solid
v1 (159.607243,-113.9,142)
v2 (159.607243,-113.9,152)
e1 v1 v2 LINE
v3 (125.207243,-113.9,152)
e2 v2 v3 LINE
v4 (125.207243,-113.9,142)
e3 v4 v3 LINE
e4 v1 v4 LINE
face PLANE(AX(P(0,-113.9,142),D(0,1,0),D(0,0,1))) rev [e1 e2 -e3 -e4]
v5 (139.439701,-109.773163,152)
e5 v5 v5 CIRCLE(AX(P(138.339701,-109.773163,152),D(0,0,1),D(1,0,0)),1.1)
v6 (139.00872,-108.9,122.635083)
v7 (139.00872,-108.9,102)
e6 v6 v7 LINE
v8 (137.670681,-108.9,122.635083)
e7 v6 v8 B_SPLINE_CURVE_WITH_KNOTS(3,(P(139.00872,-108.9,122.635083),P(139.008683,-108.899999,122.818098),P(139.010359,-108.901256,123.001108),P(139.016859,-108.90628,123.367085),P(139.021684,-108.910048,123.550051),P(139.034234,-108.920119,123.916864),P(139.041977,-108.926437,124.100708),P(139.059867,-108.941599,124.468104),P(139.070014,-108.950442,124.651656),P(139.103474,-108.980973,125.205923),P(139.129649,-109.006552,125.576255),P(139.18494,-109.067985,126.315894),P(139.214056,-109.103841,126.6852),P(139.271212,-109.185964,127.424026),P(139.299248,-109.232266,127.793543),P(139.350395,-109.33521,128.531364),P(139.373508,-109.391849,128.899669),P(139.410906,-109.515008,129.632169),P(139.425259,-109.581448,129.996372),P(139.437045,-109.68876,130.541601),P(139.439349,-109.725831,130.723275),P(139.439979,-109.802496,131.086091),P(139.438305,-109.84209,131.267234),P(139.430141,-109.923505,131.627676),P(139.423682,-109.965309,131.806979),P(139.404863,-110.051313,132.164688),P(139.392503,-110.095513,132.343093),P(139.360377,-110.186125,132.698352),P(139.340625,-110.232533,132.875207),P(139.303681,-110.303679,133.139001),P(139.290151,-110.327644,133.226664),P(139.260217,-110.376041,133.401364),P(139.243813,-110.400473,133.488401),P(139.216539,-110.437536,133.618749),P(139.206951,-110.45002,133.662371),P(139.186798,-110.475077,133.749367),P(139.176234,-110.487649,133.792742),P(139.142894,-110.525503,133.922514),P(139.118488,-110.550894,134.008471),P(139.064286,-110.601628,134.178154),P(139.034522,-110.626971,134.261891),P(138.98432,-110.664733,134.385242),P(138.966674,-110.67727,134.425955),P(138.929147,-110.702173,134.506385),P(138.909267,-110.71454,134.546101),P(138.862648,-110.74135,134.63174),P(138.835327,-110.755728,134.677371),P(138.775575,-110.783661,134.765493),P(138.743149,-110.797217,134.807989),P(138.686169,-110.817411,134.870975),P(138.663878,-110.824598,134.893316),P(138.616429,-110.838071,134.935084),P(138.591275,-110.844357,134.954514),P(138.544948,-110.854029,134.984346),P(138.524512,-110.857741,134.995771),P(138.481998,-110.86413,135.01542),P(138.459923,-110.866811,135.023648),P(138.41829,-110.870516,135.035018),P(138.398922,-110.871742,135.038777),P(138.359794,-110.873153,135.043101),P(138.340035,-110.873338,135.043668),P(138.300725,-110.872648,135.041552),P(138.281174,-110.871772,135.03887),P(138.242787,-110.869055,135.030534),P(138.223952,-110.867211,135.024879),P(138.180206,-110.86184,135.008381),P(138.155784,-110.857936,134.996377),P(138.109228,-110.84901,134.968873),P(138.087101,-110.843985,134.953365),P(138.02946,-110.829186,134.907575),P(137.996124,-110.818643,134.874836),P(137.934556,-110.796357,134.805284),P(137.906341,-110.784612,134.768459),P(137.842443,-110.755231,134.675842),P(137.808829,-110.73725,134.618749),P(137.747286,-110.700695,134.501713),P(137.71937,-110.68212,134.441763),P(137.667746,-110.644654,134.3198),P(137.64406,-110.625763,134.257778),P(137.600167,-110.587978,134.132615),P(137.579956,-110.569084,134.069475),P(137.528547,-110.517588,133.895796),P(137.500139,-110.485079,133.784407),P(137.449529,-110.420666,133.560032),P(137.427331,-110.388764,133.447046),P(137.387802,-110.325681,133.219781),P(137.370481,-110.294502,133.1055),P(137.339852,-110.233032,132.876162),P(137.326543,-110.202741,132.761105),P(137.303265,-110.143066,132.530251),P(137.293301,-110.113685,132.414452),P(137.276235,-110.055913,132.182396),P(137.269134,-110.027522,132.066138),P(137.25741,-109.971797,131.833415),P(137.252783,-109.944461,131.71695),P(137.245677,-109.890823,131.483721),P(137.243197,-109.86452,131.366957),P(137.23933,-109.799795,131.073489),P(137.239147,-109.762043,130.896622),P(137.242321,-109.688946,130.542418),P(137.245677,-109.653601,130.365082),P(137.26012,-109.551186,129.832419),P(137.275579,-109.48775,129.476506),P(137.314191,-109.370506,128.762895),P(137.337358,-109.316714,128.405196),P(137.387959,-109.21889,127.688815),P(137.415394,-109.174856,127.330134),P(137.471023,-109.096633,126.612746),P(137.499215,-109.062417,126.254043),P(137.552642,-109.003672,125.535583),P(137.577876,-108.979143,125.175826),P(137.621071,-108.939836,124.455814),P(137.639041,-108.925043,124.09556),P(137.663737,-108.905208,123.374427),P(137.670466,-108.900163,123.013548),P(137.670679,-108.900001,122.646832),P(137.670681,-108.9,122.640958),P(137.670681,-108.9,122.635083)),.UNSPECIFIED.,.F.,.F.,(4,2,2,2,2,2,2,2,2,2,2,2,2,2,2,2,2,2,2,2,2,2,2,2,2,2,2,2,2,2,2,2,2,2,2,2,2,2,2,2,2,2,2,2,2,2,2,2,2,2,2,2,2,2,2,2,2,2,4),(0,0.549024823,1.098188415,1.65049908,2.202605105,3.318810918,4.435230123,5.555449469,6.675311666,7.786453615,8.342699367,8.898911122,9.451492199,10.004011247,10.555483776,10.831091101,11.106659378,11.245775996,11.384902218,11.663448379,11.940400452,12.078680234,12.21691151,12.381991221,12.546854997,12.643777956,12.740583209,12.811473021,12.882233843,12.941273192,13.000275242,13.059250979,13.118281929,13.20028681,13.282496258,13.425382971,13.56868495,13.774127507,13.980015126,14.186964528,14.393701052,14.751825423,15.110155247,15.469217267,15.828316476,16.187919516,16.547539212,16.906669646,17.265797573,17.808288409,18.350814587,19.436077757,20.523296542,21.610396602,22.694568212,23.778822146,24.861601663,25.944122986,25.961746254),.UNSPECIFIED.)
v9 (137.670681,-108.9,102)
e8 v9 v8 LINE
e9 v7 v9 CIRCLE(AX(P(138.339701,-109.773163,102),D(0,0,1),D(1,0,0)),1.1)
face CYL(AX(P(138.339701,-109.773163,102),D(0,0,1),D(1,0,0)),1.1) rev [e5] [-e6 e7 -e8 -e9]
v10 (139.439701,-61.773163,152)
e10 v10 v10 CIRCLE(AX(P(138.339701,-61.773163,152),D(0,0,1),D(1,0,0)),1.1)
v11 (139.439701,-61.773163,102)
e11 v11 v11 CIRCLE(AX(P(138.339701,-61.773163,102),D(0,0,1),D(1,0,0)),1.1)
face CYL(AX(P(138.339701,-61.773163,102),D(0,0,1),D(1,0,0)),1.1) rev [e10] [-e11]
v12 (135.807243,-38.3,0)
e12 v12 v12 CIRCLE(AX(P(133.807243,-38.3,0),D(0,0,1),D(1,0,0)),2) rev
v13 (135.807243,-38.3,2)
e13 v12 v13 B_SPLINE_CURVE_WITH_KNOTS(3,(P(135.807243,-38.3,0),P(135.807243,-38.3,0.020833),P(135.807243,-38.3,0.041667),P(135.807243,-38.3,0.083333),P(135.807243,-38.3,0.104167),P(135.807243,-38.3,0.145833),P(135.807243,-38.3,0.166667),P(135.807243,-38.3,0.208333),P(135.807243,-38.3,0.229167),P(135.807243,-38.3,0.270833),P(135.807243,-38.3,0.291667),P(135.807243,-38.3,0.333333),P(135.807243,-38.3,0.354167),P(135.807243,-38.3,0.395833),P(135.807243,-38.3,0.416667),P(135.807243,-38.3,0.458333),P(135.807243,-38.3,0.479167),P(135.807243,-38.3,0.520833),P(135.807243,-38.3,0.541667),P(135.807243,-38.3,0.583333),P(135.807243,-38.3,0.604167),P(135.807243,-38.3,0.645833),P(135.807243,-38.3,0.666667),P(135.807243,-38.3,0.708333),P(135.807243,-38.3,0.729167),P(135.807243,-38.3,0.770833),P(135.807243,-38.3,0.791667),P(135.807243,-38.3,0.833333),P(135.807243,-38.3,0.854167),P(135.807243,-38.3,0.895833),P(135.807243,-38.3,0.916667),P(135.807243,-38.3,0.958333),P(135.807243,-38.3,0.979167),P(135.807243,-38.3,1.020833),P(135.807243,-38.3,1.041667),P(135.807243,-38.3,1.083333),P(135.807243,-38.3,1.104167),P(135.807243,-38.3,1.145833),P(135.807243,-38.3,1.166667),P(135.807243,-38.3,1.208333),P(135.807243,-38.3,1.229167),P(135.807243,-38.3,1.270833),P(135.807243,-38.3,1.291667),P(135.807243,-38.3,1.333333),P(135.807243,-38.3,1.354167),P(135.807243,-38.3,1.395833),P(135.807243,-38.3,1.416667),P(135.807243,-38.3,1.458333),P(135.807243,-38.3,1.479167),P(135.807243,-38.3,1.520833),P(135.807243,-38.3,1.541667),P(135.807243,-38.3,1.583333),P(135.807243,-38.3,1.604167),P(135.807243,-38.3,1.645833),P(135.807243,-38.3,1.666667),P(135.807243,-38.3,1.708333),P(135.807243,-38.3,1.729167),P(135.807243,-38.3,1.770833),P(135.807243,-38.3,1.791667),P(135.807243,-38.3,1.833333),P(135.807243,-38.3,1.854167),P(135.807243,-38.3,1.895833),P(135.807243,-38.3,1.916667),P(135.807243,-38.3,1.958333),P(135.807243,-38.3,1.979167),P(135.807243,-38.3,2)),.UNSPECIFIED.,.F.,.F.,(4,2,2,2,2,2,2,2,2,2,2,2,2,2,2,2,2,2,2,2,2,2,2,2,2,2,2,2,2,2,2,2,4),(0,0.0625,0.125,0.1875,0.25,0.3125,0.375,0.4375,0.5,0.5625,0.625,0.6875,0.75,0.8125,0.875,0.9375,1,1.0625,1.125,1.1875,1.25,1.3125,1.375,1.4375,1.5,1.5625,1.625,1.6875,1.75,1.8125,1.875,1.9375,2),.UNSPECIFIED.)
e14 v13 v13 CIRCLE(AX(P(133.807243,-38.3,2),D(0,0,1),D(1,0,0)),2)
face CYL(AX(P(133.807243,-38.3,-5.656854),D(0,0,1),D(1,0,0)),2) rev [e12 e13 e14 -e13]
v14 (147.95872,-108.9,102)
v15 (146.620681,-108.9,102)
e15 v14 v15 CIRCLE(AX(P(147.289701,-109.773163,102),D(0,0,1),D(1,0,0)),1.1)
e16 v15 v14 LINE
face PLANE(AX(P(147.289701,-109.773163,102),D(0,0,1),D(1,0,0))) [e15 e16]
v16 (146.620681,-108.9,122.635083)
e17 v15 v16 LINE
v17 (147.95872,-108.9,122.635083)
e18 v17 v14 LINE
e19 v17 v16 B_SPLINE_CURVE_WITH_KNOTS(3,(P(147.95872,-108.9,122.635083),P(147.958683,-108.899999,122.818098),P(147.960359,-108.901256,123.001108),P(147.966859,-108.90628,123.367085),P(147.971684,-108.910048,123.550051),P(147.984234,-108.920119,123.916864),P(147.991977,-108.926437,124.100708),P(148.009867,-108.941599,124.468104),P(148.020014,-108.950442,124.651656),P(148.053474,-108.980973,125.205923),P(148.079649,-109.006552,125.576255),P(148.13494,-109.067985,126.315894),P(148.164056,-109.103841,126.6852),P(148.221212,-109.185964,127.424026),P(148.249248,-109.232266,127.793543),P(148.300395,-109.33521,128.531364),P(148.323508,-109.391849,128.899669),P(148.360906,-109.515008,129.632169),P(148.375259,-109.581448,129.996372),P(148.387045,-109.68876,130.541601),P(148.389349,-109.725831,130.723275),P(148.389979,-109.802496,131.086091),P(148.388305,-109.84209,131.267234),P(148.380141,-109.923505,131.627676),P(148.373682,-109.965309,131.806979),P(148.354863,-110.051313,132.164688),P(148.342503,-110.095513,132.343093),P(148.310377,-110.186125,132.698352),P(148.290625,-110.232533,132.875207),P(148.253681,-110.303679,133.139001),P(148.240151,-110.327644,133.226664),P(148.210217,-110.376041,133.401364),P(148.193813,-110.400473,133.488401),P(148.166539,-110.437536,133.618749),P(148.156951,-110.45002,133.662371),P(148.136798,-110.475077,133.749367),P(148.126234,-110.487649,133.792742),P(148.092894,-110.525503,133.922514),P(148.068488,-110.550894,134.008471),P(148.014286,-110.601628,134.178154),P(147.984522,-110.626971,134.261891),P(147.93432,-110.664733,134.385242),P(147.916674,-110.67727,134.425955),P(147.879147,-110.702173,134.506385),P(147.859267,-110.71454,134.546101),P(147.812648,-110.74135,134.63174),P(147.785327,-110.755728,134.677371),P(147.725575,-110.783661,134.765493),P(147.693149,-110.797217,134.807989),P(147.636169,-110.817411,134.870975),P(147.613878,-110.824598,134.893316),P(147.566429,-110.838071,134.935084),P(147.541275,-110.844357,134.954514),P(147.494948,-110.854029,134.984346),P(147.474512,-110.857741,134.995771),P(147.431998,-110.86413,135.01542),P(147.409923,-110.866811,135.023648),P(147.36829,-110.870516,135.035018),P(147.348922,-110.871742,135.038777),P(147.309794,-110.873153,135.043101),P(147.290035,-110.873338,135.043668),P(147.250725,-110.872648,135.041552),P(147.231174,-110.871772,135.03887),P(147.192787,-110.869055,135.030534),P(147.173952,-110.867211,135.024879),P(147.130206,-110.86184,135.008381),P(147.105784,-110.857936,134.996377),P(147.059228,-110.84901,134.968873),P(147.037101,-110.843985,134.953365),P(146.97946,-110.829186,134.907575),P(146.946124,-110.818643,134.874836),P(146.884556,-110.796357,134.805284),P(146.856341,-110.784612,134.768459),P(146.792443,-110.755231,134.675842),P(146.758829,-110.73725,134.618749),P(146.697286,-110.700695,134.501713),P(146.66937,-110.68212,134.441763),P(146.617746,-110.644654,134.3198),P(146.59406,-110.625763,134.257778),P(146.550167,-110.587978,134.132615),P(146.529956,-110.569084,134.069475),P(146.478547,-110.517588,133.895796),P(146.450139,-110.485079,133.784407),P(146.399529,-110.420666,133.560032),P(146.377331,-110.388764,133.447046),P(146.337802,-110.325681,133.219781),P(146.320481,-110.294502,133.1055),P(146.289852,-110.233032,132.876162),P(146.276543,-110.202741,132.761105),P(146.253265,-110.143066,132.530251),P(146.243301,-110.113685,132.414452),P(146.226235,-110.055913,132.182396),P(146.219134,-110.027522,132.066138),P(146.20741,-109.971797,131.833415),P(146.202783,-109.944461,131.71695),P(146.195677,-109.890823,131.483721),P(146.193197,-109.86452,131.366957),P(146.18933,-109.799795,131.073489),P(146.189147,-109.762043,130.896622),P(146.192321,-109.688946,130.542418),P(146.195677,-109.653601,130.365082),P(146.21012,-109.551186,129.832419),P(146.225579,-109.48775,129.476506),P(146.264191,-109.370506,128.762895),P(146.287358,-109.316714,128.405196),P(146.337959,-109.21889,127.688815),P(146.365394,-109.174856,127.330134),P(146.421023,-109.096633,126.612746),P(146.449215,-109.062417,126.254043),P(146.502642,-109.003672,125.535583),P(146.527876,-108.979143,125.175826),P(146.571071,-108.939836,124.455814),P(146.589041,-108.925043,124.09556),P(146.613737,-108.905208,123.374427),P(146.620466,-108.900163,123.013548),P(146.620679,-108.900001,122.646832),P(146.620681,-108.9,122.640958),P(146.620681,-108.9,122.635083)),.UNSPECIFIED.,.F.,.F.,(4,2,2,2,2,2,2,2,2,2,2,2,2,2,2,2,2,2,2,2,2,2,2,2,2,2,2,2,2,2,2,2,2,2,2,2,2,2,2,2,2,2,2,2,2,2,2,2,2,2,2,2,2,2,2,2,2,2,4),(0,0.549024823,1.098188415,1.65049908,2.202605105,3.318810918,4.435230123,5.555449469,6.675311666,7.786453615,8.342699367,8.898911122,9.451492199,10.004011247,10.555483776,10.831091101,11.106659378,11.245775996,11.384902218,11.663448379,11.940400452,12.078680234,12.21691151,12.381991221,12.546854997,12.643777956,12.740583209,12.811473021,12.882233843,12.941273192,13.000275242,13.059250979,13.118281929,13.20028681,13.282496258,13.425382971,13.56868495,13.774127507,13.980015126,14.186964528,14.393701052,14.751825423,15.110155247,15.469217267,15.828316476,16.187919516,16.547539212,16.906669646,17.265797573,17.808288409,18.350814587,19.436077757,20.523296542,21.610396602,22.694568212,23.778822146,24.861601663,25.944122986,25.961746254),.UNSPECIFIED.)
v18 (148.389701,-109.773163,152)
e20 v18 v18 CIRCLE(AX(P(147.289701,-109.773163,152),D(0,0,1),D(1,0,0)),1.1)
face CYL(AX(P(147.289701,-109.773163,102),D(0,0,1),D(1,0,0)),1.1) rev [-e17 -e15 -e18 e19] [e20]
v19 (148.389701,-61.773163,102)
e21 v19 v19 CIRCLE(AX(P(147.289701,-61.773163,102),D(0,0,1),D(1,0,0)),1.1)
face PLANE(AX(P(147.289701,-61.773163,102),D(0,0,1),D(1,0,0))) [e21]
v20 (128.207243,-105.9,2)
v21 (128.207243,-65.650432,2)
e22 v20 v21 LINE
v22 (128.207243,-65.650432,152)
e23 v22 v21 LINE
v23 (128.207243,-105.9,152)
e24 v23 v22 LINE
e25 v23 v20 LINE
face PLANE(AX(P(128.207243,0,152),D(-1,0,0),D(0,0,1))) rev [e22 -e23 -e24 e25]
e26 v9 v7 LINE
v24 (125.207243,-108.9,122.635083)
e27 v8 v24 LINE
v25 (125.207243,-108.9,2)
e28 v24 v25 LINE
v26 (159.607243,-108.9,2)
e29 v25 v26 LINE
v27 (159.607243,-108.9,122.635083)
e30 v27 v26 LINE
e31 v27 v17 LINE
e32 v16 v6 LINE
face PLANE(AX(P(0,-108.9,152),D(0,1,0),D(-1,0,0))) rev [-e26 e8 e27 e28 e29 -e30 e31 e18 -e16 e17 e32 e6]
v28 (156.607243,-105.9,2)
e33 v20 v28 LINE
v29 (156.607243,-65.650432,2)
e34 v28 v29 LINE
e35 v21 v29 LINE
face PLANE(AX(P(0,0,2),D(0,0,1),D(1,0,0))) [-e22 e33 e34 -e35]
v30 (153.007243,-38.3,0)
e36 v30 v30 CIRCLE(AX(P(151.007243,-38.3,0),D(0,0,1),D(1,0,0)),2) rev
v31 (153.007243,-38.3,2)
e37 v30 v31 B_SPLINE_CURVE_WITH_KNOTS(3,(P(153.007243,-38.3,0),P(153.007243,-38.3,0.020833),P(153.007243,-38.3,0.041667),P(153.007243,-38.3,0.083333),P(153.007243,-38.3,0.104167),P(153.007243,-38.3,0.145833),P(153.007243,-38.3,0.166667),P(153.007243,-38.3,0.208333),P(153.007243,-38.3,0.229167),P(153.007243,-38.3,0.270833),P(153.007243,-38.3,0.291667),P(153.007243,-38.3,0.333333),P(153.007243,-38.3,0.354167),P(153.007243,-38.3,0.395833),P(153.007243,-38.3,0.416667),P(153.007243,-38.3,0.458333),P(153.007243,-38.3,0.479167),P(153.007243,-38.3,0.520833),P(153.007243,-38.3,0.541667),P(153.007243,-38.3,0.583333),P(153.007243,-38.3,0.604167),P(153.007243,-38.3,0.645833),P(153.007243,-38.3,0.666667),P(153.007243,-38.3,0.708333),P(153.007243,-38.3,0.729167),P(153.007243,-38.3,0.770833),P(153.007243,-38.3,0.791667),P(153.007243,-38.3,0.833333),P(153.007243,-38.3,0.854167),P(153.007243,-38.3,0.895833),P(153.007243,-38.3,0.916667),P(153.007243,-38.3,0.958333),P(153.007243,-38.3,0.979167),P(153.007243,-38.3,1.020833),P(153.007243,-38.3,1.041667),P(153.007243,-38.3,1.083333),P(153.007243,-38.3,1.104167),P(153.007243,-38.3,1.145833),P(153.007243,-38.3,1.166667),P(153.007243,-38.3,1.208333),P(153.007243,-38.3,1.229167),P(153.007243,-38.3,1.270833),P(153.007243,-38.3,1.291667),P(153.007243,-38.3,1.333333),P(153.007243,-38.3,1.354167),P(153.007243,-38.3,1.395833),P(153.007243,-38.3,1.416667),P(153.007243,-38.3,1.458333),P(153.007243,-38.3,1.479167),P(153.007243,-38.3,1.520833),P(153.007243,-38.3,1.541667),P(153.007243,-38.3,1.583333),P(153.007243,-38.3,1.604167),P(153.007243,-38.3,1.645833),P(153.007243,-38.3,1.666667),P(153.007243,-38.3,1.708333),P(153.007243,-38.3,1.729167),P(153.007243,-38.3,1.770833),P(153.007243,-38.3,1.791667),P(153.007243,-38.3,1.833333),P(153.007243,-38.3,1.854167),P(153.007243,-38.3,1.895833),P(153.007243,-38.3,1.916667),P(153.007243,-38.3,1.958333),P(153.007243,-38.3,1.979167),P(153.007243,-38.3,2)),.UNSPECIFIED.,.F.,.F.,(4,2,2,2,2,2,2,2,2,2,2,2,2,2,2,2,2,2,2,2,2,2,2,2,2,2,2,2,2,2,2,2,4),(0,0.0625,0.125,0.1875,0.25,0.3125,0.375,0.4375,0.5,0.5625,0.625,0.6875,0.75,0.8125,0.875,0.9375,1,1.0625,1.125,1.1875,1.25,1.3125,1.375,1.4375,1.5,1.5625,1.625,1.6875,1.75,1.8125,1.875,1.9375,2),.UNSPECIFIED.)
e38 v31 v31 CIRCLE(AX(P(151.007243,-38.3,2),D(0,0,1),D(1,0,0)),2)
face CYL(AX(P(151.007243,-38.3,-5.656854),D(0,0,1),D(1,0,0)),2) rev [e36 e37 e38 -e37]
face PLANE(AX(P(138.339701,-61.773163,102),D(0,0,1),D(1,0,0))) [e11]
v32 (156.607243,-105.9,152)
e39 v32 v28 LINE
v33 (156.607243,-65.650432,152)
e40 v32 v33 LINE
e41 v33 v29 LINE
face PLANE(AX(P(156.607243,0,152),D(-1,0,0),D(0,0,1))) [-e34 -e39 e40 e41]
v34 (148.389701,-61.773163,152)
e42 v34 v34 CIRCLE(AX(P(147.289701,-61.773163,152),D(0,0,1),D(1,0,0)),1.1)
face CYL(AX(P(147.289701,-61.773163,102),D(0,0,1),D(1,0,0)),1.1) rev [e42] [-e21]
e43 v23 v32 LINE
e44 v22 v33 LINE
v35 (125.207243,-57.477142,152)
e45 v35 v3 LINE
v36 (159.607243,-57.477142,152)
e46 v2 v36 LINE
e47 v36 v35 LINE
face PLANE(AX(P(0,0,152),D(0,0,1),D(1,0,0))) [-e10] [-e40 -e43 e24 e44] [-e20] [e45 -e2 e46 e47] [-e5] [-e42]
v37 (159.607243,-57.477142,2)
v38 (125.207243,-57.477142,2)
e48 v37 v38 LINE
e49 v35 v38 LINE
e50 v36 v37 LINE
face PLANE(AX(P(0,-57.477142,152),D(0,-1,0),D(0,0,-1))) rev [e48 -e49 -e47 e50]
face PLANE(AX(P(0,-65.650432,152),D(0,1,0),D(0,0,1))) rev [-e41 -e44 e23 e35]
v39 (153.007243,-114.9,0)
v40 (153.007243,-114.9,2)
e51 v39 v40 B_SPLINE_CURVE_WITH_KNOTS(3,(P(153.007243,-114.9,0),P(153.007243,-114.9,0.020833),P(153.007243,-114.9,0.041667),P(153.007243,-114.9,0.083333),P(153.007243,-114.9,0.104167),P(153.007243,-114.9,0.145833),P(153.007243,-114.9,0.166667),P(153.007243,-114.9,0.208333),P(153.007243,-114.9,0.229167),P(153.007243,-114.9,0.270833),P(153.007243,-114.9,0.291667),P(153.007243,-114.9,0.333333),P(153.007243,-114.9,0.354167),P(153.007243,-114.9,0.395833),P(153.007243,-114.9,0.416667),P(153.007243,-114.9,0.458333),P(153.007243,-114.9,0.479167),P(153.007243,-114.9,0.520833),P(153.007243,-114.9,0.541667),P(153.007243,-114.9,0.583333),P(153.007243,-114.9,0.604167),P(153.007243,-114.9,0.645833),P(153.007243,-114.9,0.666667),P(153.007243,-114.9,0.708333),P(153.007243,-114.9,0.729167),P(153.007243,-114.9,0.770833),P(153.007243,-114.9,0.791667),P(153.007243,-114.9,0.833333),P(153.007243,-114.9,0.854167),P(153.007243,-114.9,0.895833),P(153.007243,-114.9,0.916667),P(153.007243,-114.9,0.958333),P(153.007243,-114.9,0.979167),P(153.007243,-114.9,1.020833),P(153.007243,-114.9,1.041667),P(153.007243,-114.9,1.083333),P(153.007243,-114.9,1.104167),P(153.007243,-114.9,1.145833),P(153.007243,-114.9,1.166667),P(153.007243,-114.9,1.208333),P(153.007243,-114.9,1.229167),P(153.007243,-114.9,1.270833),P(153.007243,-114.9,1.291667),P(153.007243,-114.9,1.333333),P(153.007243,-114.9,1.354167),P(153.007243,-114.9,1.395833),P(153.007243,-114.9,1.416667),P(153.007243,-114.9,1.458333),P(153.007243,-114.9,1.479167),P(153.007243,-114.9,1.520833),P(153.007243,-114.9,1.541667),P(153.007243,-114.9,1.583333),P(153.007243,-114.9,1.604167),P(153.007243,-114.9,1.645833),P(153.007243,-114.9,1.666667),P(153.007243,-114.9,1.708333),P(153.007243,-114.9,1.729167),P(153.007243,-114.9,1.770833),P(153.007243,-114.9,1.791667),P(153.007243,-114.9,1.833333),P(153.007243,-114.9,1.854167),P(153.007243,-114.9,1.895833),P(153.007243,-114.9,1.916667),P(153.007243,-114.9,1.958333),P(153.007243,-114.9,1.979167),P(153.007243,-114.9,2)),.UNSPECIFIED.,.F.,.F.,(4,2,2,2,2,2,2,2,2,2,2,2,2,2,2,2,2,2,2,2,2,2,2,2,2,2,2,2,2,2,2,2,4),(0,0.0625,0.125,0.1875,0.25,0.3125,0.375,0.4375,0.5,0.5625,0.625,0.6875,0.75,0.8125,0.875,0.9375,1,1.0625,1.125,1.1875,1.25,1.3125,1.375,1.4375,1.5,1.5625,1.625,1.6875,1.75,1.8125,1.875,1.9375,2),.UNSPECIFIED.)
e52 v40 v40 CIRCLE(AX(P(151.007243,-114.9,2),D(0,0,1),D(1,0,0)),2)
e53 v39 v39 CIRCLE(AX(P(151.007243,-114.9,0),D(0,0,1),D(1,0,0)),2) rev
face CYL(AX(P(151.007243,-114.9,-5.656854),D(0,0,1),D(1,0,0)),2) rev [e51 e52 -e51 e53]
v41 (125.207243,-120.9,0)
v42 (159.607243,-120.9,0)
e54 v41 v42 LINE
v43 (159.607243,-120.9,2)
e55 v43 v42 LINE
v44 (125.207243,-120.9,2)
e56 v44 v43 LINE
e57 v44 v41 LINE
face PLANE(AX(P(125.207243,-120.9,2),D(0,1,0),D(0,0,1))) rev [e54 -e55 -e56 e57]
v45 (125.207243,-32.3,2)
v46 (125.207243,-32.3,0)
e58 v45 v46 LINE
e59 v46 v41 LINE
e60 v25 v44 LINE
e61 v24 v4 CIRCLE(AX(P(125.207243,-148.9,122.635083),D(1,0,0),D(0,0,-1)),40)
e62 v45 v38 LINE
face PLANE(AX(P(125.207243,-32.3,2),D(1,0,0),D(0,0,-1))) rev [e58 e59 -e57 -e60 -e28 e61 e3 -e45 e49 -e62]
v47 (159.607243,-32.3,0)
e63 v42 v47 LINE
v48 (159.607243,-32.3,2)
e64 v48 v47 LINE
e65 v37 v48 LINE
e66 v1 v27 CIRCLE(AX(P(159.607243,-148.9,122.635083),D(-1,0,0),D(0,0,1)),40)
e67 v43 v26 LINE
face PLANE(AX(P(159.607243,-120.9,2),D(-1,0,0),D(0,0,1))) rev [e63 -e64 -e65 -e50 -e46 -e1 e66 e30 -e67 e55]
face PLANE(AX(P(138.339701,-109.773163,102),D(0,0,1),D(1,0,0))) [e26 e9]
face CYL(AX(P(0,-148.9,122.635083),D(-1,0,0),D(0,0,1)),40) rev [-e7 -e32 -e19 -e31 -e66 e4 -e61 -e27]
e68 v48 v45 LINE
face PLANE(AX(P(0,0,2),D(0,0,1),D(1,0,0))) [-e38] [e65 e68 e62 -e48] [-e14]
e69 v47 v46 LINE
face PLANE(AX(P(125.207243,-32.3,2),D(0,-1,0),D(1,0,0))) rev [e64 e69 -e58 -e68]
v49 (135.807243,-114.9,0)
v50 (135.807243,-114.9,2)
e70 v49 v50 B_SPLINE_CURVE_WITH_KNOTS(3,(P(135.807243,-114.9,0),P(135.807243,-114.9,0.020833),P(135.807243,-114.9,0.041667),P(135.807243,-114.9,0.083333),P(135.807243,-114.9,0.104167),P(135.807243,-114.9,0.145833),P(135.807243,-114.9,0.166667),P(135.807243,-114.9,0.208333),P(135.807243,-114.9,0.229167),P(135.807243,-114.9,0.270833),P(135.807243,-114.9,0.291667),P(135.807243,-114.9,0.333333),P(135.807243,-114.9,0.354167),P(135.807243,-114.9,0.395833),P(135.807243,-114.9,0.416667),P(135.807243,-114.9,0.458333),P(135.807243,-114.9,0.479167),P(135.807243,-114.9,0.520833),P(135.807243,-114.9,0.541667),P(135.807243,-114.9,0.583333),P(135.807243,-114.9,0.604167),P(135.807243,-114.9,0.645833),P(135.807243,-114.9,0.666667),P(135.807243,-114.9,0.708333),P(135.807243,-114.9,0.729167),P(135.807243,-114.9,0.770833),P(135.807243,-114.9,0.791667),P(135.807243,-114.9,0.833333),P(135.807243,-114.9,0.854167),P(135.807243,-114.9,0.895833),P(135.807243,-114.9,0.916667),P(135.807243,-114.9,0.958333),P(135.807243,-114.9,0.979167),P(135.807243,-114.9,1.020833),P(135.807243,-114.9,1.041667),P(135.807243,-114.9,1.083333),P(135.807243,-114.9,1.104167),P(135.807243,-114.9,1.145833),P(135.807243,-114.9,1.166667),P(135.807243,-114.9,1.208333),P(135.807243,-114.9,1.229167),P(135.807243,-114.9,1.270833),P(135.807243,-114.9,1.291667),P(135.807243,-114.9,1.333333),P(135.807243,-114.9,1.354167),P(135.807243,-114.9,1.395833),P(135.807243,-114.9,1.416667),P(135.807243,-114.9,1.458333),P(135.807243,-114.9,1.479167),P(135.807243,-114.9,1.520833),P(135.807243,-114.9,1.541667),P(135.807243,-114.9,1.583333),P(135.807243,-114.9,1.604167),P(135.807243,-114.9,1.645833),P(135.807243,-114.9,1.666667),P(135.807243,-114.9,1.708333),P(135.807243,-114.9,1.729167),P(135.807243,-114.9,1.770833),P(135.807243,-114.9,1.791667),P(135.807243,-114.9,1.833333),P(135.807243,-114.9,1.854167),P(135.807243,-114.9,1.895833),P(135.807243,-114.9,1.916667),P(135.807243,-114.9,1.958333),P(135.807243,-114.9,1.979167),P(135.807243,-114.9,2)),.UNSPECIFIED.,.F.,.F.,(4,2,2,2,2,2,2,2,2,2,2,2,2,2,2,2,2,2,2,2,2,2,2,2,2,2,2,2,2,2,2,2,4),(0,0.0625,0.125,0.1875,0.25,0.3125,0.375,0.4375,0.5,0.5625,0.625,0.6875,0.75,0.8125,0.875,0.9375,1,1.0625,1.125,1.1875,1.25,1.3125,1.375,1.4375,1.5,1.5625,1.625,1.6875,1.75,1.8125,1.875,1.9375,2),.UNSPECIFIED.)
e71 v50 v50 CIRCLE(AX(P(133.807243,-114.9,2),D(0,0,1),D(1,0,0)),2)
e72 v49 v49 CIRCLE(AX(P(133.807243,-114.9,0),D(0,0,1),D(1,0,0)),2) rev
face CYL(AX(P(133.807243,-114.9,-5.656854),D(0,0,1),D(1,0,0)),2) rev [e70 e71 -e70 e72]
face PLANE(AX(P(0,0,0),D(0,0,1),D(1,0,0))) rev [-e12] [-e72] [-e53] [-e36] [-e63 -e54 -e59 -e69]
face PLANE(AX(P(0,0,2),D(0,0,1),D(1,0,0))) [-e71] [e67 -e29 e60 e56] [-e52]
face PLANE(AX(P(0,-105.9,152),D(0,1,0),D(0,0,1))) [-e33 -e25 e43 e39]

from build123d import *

# Parameters (mm, degrees)
SKETCH2_W           = 34.4
SKETCH2_H           = 88.6
BOSS_EXTRUDE1_DEPTH = 2
SKETCH5_R           = 2
CUT_EXTRUDE1_DEPTH  = 2
SKETCH8_W           = 28.4
SKETCH8_H           = 8.173290792
BOSS_EXTRUDE2_DEPTH = 150
SKETCH11_W          = 34.4
SKETCH11_H          = 5
BOSS_EXTRUDE4_DEPTH = 10
SKETCH12_R          = 1.1
CUT_EXTRUDE2_DEPTH  = 50
FILLET1_R           = 40


with BuildPart() as part:
    # Sketch2 → Boss-Extrude1 (new body)
    with BuildSketch(Plane.XY):
        with Locations((142.4072434, -76.6)):
            Rectangle(SKETCH2_W, SKETCH2_H)
    extrude(amount=BOSS_EXTRUDE1_DEPTH)

    # Sketch5 → Cut-Extrude1 (cut)
    with BuildSketch(Plane.XY.offset(2)):
        with Locations((151.0072434, -114.9)):
            Circle(SKETCH5_R)
        with Locations((133.8072434, -114.9)):
            Circle(SKETCH5_R)
        with Locations((133.8072434, -38.3)):
            Circle(SKETCH5_R)
        with Locations((151.0072434, -38.3)):
            Circle(SKETCH5_R)
    extrude(amount=-CUT_EXTRUDE1_DEPTH, mode=Mode.SUBTRACT)

    # Sketch8 → Boss-Extrude2 (add)
    with BuildSketch(Plane.XY.offset(2)):
        Polygon((125.2072434, -57.477141606), (125.2072434, -108.9), (159.6072434, -108.9), (159.6072434, -57.477141606), (156.6072434, -57.477141606), (156.6072434, -65.650432398), (156.6072434, -105.9), (128.2072434, -105.9), (128.2072434, -65.650432398), (128.2072434, -57.477141606), align=None)
        with Locations((142.4072434, -61.563787002)):
            Rectangle(SKETCH8_W, SKETCH8_H)
    extrude(amount=BOSS_EXTRUDE2_DEPTH)

    # Sketch11 → Boss-Extrude4 (add)
    with BuildSketch(Plane.XY.offset(152)):
        with Locations((142.4072434, -111.4)):
            Rectangle(SKETCH11_W, SKETCH11_H)
    extrude(amount=-BOSS_EXTRUDE4_DEPTH)

    # Sketch12 → Cut-Extrude2 (cut)
    with BuildSketch(Plane.XY.offset(152)):
        with Locations((138.33970051, -61.773162564)):
            Circle(SKETCH12_R)
        with Locations((147.28970051, -61.773162564)):
            Circle(SKETCH12_R)
        with Locations((138.33970051, -109.773162564)):
            Circle(SKETCH12_R)
        with Locations((147.28970051, -109.773162564)):
            Circle(SKETCH12_R)
    extrude(amount=-CUT_EXTRUDE2_DEPTH, mode=Mode.SUBTRACT)

    # Fillet1
    # the kernel refuses this fillet: 40 mm, written as the material it adds along each edge
    with BuildSketch(Plane(origin=(125.2072434, -108.9, 142), x_dir=(0, -1, 0), z_dir=(1, 0, 0))) as fillet1_piece_1_section:
        with BuildLine():
            CenterArc((40, 19.364916731), FILLET1_R, 180, 28.955024372)
            Line((0, 19.364916731), (-0.8, 19.364916731))
            Line((-0.8, 19.364916731), (-0.8, 0))
            Line((-0.8, 0), (0, -0.8))
            ThreePointArc((0, -0.8), (2.5, -0.8), (4.3, -0.387298335))
            Line((4.3, -0.387298335), (5, 0))
        make_face()
    fillet1_piece_1 = extrude(amount=60.875729403, mode=Mode.PRIVATE)
    fillet1_piece_1 = split(fillet1_piece_1, bisect_by=Plane(origin=(159.6072434, -109.845330822, 136.09364372), z_dir=(-1, 0, 0)), keep=Keep.TOP, mode=Mode.PRIVATE)
    fillet1_piece_1 = fillet1_piece_1 - Plane(origin=(147.28970051, -109.773162564, 136.09364372), x_dir=(1, 0, 0), z_dir=(0, 0, 1)) * Cylinder(1.1, 200, mode=Mode.PRIVATE)
    fillet1_piece_1 = fillet1_piece_1 - Plane(origin=(138.33970051, -109.773162564, 136.09364372), x_dir=(1, 0, 0), z_dir=(0, 0, 1)) * Cylinder(1.1, 200, mode=Mode.PRIVATE)
    add(fillet1_piece_1)


solid = part.part
